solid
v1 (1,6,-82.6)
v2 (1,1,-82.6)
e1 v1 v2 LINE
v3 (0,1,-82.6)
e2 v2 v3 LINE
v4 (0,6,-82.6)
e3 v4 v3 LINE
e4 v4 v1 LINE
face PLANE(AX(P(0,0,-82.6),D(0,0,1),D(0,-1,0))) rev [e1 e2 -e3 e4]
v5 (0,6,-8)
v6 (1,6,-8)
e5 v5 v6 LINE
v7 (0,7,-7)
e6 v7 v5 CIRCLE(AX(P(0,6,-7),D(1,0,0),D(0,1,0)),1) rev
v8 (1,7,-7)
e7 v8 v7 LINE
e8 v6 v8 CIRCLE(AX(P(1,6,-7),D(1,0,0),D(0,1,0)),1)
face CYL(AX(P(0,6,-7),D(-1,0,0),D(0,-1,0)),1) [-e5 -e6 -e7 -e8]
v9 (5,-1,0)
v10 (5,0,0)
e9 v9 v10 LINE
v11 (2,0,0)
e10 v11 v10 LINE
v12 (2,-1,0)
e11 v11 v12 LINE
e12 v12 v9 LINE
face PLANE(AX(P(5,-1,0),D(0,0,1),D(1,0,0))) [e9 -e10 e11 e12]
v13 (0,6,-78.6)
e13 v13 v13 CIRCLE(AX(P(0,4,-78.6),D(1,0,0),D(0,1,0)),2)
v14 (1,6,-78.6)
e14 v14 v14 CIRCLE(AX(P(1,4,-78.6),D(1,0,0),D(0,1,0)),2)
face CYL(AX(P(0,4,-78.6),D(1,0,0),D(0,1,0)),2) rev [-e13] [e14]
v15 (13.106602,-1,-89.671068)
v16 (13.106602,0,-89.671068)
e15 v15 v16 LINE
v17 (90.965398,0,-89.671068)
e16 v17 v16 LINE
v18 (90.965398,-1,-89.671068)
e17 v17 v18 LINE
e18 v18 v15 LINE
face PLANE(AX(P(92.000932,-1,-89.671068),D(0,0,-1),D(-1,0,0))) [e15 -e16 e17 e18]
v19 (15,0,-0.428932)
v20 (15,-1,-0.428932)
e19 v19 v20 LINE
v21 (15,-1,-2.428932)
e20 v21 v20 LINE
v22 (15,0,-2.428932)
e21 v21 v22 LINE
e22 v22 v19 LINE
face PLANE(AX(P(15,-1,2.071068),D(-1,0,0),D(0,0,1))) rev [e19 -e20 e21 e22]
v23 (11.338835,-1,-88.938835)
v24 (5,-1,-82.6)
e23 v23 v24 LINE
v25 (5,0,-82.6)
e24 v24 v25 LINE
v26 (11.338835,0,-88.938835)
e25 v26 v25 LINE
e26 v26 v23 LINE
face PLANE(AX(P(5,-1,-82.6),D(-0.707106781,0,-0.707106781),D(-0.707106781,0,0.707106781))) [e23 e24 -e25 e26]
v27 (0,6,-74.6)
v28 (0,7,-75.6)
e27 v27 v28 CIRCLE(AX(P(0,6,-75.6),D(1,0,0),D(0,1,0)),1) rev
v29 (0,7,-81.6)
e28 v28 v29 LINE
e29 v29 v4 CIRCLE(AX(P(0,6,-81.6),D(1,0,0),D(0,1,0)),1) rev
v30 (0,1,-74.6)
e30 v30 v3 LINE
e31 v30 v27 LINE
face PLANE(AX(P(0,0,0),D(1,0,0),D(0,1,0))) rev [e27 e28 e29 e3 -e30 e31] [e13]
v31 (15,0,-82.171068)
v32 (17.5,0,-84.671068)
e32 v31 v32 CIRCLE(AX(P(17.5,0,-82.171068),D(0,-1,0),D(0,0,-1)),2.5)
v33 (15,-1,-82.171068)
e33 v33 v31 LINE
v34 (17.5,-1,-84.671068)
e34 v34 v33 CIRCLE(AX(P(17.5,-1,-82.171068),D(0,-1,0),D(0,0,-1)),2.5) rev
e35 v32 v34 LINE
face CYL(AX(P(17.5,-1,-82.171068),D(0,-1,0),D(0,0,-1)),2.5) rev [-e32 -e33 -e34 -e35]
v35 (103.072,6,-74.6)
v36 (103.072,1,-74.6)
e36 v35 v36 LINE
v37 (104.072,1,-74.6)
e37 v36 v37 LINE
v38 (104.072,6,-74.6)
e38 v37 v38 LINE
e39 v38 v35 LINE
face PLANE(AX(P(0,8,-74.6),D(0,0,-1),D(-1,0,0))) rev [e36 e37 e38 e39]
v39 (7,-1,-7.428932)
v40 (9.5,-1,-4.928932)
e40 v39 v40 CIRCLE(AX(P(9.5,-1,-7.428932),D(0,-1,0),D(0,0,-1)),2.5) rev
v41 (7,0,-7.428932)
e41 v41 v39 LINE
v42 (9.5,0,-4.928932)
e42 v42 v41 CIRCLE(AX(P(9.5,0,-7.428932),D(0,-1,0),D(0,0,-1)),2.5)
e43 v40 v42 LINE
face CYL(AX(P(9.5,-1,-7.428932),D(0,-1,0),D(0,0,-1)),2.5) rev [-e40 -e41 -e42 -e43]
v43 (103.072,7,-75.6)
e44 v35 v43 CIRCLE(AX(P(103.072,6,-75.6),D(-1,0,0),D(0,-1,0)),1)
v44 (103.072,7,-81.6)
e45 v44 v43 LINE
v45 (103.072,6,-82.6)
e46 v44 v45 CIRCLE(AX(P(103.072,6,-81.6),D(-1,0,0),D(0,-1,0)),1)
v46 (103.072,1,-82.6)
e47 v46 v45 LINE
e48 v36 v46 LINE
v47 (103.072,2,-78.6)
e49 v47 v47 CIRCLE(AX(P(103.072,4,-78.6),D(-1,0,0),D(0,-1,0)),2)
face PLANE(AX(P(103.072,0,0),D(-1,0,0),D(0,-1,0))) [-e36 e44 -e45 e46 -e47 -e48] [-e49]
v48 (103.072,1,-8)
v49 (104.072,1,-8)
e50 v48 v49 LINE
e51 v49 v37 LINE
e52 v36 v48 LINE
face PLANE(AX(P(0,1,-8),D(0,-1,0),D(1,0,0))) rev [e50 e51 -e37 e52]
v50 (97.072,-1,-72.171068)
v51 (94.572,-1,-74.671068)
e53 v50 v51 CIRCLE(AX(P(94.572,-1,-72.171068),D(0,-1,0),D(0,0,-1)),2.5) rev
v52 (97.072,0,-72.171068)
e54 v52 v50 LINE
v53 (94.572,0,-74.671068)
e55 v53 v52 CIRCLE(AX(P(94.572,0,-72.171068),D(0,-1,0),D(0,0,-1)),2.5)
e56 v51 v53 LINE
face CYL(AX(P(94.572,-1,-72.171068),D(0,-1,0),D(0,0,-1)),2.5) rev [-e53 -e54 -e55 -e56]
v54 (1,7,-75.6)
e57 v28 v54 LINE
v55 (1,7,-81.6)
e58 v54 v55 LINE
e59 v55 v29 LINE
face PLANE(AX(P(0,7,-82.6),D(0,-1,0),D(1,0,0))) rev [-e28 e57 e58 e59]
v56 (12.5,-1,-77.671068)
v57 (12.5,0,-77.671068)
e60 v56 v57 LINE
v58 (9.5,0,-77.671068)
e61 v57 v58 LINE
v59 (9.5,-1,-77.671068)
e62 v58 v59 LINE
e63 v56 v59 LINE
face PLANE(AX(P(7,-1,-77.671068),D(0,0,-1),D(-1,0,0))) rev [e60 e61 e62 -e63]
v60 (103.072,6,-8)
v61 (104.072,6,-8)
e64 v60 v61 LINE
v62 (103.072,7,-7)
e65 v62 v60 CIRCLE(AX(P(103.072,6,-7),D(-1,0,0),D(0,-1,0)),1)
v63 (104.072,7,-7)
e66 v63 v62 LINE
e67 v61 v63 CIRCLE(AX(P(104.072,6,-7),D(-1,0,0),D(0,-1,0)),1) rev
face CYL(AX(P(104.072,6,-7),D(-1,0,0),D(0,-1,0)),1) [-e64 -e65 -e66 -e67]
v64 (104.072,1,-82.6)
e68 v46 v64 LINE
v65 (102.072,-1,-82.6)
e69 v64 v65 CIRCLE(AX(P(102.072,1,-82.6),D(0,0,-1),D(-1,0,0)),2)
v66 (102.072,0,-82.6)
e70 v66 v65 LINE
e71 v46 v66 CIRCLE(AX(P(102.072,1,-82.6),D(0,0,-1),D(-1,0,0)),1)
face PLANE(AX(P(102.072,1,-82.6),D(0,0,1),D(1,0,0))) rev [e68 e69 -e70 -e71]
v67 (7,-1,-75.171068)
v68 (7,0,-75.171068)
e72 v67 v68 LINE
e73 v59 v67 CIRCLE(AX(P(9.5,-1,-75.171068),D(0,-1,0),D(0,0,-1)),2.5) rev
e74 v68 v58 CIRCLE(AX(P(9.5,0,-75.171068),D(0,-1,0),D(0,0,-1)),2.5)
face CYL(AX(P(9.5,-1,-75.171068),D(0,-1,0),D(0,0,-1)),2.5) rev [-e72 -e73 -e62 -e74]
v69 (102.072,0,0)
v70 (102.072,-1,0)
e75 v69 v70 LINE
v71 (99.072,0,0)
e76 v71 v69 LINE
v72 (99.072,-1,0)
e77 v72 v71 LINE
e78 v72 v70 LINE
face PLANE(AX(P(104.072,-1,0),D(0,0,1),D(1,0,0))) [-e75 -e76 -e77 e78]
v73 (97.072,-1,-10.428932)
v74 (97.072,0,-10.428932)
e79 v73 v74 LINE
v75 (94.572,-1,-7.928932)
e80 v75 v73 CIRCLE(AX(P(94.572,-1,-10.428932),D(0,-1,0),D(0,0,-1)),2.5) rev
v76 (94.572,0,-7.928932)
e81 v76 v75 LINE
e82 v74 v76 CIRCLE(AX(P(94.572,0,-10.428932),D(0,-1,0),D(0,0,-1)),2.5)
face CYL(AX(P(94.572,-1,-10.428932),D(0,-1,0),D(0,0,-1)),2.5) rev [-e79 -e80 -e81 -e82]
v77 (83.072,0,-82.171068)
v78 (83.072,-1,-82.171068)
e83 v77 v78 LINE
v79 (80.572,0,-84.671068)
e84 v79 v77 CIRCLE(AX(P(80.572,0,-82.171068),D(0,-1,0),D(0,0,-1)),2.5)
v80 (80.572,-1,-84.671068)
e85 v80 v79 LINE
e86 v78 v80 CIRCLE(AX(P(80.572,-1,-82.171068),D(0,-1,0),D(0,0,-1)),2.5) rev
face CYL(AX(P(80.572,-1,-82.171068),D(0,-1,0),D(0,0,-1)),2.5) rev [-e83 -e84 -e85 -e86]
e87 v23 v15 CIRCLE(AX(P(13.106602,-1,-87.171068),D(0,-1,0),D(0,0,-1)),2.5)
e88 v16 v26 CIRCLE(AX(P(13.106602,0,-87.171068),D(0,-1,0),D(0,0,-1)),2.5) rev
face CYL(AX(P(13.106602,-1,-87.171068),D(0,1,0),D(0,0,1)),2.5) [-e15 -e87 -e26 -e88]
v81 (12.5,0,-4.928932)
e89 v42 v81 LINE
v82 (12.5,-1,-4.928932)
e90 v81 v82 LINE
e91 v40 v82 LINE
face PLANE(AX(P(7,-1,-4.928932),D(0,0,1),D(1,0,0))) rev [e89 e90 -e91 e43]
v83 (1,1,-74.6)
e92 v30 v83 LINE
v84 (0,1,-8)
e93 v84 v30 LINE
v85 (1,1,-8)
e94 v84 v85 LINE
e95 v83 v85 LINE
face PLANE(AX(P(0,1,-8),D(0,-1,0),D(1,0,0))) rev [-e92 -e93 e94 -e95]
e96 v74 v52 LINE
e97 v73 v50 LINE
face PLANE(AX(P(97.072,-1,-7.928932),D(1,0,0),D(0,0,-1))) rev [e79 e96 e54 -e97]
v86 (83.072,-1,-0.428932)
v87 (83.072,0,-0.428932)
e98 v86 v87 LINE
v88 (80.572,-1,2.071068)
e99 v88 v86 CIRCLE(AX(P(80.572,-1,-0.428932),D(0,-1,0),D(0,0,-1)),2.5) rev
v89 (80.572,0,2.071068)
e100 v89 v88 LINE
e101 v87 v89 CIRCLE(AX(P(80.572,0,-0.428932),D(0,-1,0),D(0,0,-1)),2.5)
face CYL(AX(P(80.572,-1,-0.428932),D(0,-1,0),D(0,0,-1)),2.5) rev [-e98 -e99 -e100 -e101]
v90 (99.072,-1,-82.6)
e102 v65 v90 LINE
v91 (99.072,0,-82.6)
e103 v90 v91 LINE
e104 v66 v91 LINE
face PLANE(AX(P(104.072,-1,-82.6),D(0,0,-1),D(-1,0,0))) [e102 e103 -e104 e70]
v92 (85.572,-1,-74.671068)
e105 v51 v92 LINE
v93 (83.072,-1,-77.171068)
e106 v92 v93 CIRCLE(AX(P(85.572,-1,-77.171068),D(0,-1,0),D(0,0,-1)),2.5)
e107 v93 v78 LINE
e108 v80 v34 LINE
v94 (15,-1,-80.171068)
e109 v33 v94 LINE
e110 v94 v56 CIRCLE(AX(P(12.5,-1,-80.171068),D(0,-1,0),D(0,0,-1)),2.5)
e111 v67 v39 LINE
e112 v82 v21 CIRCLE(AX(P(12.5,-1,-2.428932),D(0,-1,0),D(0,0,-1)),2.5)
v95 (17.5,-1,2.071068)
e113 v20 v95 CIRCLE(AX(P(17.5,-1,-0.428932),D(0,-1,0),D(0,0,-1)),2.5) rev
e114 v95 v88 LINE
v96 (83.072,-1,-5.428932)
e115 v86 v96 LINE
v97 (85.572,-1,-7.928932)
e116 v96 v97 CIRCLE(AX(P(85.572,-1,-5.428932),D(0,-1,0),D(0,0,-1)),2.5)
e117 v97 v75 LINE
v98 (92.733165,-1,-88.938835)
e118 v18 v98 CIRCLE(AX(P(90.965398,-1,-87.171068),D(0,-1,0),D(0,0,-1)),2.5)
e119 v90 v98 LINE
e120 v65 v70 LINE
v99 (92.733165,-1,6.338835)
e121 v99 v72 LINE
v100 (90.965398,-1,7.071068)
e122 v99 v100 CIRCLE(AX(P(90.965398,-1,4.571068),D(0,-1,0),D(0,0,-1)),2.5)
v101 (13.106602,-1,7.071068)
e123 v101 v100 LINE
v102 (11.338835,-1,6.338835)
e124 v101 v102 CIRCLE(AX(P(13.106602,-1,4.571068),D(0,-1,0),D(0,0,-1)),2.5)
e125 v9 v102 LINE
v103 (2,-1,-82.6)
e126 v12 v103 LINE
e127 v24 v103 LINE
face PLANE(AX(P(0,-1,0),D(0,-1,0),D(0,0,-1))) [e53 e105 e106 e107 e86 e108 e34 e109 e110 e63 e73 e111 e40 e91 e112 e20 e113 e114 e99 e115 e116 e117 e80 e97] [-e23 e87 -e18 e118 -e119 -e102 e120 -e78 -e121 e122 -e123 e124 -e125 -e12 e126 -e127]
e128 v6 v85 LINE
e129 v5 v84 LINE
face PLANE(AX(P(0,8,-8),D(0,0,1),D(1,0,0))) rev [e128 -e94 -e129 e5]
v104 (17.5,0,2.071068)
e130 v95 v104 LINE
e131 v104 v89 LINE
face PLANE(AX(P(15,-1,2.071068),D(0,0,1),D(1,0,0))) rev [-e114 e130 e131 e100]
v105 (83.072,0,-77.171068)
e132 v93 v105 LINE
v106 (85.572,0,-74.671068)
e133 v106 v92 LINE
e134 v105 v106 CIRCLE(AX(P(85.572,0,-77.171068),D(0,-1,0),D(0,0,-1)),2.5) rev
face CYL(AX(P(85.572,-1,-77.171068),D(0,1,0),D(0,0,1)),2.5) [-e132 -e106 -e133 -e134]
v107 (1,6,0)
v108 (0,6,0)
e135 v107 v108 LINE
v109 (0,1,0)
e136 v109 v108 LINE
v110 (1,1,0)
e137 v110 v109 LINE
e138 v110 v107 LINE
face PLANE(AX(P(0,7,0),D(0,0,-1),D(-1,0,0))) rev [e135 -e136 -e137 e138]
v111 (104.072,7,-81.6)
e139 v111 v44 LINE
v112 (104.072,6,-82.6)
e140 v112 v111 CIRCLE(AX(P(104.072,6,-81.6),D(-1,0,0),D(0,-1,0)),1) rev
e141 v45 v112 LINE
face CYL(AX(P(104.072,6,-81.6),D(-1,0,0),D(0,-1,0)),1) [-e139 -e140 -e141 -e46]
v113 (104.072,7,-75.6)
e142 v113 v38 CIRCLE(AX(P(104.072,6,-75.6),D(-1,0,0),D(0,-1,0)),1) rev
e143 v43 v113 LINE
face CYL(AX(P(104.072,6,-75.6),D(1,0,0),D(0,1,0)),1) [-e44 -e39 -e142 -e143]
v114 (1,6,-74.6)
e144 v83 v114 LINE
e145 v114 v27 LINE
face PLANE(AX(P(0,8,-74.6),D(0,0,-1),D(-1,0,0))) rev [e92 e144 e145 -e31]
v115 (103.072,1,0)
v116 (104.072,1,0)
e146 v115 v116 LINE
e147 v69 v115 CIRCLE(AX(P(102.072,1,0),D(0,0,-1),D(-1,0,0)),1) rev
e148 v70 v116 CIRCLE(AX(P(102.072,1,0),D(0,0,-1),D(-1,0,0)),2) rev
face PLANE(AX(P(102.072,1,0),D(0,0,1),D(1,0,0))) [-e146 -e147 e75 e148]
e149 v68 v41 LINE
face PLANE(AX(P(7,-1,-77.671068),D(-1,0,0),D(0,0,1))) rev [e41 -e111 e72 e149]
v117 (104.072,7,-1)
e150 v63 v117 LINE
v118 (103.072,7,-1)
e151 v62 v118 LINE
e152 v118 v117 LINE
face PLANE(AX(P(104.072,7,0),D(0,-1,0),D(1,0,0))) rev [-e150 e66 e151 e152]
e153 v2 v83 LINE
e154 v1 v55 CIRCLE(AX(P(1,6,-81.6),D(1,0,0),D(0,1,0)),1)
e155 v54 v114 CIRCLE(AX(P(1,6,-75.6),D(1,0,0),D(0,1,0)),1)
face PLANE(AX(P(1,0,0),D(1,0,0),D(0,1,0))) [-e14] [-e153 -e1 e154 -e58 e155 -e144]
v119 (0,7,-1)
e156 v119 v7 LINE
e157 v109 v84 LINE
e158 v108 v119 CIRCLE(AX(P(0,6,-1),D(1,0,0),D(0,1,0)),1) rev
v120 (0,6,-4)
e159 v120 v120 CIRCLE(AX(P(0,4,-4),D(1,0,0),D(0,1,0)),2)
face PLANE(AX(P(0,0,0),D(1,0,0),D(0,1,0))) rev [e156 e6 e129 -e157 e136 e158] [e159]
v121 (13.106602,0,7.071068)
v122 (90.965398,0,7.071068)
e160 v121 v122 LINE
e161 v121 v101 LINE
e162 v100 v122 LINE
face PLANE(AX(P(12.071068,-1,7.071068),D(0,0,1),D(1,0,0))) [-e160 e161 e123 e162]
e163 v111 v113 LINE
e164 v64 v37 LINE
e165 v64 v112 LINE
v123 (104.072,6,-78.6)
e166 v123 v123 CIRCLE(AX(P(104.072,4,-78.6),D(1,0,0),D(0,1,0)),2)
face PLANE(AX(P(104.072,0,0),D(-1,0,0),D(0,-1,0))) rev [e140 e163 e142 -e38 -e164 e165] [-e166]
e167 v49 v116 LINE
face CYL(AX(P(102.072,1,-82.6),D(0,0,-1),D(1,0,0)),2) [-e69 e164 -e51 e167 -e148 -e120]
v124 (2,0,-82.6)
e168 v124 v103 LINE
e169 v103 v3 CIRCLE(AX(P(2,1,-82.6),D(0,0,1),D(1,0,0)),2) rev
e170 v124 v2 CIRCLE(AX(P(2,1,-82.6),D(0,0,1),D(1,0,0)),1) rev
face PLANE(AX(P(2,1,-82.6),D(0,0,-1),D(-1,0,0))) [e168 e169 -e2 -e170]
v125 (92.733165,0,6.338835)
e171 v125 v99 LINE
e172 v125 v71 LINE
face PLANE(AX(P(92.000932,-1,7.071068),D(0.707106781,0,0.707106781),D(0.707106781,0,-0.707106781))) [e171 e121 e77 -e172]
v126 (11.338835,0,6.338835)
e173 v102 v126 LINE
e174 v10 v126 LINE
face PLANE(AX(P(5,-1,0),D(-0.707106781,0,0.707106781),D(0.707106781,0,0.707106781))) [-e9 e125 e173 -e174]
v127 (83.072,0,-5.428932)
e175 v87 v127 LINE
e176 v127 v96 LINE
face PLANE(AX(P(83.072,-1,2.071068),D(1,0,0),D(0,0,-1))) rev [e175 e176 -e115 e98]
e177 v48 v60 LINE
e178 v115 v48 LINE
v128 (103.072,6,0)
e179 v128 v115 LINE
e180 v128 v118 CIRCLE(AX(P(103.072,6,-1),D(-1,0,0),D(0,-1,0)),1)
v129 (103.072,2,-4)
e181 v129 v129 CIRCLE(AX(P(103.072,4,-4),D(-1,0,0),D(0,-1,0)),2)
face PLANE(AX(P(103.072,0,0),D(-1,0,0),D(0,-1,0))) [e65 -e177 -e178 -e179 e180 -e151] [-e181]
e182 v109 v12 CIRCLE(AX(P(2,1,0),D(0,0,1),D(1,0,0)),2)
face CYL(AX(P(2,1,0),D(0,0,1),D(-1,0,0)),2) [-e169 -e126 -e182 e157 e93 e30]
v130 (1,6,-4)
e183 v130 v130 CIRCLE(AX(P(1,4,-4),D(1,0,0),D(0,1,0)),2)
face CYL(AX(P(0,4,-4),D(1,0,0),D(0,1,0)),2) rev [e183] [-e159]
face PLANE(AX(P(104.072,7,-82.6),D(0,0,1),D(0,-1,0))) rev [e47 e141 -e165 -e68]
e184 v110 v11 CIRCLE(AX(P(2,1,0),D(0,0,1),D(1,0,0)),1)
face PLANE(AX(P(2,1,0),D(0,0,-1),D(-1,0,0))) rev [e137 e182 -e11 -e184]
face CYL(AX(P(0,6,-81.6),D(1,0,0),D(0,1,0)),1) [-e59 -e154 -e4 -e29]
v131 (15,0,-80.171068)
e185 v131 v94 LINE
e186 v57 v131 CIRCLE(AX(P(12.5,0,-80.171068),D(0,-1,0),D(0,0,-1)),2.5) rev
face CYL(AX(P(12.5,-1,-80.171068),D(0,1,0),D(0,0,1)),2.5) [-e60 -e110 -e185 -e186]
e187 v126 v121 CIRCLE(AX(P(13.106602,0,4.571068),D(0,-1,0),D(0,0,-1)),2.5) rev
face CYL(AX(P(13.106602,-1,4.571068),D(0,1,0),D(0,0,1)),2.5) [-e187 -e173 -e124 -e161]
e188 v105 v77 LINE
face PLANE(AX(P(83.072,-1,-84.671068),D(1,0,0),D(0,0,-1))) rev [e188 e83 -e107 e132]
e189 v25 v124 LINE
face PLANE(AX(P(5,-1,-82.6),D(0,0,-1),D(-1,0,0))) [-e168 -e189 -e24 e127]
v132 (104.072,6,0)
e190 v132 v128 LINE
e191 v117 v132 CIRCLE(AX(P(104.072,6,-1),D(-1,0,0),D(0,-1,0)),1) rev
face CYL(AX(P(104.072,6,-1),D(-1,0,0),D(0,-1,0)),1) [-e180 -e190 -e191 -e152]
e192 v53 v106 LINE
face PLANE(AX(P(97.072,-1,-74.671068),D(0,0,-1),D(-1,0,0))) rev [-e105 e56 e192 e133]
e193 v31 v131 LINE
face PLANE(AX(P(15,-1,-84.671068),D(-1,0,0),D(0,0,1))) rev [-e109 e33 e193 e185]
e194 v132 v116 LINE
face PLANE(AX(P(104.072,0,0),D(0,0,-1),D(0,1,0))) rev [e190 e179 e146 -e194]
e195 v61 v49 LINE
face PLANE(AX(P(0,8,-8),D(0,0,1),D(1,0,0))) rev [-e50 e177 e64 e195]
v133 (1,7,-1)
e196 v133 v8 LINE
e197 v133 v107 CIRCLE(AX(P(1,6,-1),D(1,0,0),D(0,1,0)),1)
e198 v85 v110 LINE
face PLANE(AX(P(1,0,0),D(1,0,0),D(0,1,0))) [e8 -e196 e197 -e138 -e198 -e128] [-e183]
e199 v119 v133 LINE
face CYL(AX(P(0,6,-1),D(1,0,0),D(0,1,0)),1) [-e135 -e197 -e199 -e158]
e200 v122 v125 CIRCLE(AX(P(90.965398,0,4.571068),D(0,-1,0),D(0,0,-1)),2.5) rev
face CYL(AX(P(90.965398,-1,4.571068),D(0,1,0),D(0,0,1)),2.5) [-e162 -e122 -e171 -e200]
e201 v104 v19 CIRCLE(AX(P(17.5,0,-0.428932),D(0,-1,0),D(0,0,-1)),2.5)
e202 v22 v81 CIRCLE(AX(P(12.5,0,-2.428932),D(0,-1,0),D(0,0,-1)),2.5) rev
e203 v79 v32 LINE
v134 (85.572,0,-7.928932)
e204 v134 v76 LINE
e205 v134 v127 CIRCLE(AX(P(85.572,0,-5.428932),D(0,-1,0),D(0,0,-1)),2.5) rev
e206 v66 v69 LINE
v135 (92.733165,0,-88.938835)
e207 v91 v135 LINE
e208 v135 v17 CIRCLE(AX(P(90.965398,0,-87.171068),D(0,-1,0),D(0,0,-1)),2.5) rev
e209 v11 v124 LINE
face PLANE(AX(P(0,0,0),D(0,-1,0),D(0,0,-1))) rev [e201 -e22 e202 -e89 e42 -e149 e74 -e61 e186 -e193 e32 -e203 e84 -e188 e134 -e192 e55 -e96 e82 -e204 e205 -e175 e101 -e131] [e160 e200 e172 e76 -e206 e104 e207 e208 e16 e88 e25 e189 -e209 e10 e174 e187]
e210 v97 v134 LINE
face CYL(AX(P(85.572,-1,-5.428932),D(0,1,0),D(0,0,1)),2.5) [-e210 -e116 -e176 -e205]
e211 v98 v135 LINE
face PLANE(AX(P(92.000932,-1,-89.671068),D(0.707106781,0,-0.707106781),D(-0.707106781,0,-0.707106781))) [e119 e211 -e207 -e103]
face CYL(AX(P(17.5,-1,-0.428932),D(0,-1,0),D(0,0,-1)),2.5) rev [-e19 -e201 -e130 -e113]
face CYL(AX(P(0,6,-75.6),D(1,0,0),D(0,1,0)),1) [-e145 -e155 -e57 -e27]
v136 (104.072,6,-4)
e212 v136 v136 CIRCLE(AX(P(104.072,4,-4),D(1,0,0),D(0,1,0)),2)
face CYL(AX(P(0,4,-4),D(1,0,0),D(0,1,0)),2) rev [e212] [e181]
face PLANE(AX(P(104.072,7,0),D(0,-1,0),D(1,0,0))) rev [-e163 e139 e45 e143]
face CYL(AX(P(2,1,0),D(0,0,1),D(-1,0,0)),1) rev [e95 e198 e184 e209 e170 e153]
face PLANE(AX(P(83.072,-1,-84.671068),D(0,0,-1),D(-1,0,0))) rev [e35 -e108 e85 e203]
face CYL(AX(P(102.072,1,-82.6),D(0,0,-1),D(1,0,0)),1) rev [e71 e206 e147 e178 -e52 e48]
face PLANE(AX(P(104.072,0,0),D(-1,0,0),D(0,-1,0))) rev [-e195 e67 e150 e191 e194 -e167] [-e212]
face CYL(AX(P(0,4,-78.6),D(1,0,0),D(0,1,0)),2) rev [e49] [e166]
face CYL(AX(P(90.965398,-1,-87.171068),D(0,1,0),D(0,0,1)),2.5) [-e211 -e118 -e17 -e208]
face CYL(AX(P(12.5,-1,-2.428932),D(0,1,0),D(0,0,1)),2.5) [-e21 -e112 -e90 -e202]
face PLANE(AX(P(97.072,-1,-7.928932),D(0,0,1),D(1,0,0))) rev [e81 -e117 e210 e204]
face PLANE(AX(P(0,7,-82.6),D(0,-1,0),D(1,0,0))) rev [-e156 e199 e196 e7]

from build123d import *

# Parameters (mm, degrees)
BASE_FLANGE2_DEPTH             = 1
EDGE_FLANGE1_STRIP_W           = 6
EDGE_FLANGE1_STRIP_H           = 1
EDGE_FLANGE1_STRIP_CUT_DEPTH   = 82.6
EDGE_FLANGE1_STRIP_2_W         = 6
EDGE_FLANGE1_STRIP_2_H         = 1
EDGE_FLANGE1_STRIP_CUT_2_DEPTH = 82.6
EDGE_FLANGE1_DEPTH             = 82.6
EDGE_FLANGE1_BEND_DEPTH        = 82.6
SKETCH16_W                     = 66.6
SKETCH16_H                     = 7
CUT_EXTRUDE1_DEPTH             = 138.553195479
FILLET1_R                      = 1
SKETCH17_R                     = 2
CUT_EXTRUDE2_DEPTH             = 138.553195479
CUT_EXTRUDE3_DEPTH             = 138.553195479
FILLET2_R                      = 2.5


# Sheet-metal steps are written as plain solids
with BuildPart() as part:
    # Sketch1 → Base-Flange2 (new body)
    with BuildSketch(Plane(origin=(0, 0, 0), x_dir=(1, 0, 0), z_dir=(0, 1, 0))):
        Polygon((0, 0), (0, 82.6), (5, 82.6), (12.071067812, 89.671067812), (92.000932188, 89.671067812), (99.072, 82.6), (104.072, 82.6), (104.072, 0), (99.072, 0), (92.000932188, -7.071067812), (12.071067812, -7.071067812), (5, 0), align=None)
    extrude(amount=-BASE_FLANGE2_DEPTH)

    # Edge-Flange1 strip (across the edge) → Edge-Flange1 strip cut (cut)
    with BuildSketch(Plane(origin=(104.072, 0, 0), x_dir=(-1, 0, 0), z_dir=(0, 0, -1))):
        with Locations((-1, -0.5)):
            Rectangle(EDGE_FLANGE1_STRIP_W, EDGE_FLANGE1_STRIP_H)
    extrude(amount=EDGE_FLANGE1_STRIP_CUT_DEPTH, mode=Mode.SUBTRACT)

    # Edge-Flange1 strip 2 (across the edge) → Edge-Flange1 strip cut 2 (cut)
    with BuildSketch(Plane.XY.offset(-82.6)):
        with Locations((-1, -0.5)):
            Rectangle(EDGE_FLANGE1_STRIP_2_W, EDGE_FLANGE1_STRIP_2_H)
    extrude(amount=EDGE_FLANGE1_STRIP_CUT_2_DEPTH, mode=Mode.SUBTRACT)

    # Edge-Flange1 section (across the edge) → Edge-Flange1 (add)
    with BuildSketch(Plane(origin=(104.072, 0, 0), x_dir=(-1, 0, 0), z_dir=(0, 0, -1))):
        with BuildLine():
            Line((0, 1), (0, 7))
            Line((0, 7), (1, 7))
            Line((1, 7), (1, 1))
            ThreePointArc((1, 1), (1.292893219, 0.292893219), (2, 0))
            Line((2, 0), (2, -1))
            ThreePointArc((2, -1), (0.585786438, -0.414213562), (0, 1))
        make_face()
    extrude(amount=EDGE_FLANGE1_DEPTH)

    # Edge-Flange1 section 2 (across the edge) → Edge-Flange1 bend (add)
    with BuildSketch(Plane.XY.offset(-82.6)):
        with BuildLine():
            Line((0, 1), (0, 7))
            Line((0, 7), (1, 7))
            Line((1, 7), (1, 1))
            ThreePointArc((1, 1), (1.292893219, 0.292893219), (2, 0))
            Line((2, 0), (2, -1))
            ThreePointArc((2, -1), (0.585786438, -0.414213562), (0, 1))
        make_face()
    extrude(amount=EDGE_FLANGE1_BEND_DEPTH)

    # Sketch16 → Cut-Extrude1 (cut, through all)
    with BuildSketch(Plane(origin=(104.072, 0, 0), x_dir=(0, 0, -1), z_dir=(1, 0, 0))):
        with Locations((41.3, 4.5)):
            Rectangle(SKETCH16_W, SKETCH16_H)
    extrude(amount=-CUT_EXTRUDE1_DEPTH, mode=Mode.SUBTRACT)

    # Fillet1
    fillet1_edges = [part.edges().sort_by_distance(p)[0] for p in [
        (0.5, 7, -74.6),
        (0.5, 7, -8),
        (103.572, 7, -8),
        (103.572, 7, -74.6),
        (103.572, 7, 0),
        (103.572, 7, -82.6),
        (0.5, 7, -82.6),
        (0.5, 7, 0),
    ]]
    fillet(fillet1_edges, radius=FILLET1_R)

    # Sketch17 → Cut-Extrude2 (cut, through all)
    with BuildSketch(Plane(origin=(104.072, 0, 0), x_dir=(0, 0, -1), z_dir=(1, 0, 0))):
        with Locations(Location((4, 4, 0), (0, 0, 90))):
            Circle(SKETCH17_R)
        with Locations(Location((78.6, 4, 0), (0, 0, 90))):
            Circle(SKETCH17_R)
    extrude(amount=-CUT_EXTRUDE2_DEPTH, mode=Mode.SUBTRACT)

    # Sketch19 → Cut-Extrude3 (cut, through all)
    with BuildSketch(Plane(origin=(0, 0, 0), x_dir=(1, 0, 0), z_dir=(0, 1, 0))):
        Polygon((15, -2.071067812), (83.072, -2.071067812), (83.072, 7.928932188), (97.072, 7.928932188), (97.072, 74.671067812), (83.072, 74.671067812), (83.072, 84.671067812), (15, 84.671067812), (15, 77.671067812), (7, 77.671067812), (7, 4.928932188), (15, 4.928932188), align=None)
    extrude(amount=-CUT_EXTRUDE3_DEPTH, mode=Mode.SUBTRACT)

    # Fillet2
    fillet2_edges = [part.edges().sort_by_distance(p)[0] for p in [
        (12.071067812, -0.5, -89.671067812),
        (92.000932188, -0.5, -89.671067812),
        (92.000932188, -0.5, 7.071067812),
        (12.071067812, -0.5, 7.071067812),
        (15, -0.5, 2.071067812),
        (15, -0.5, -4.928932188),
        (7, -0.5, -4.928932188),
        (7, -0.5, -77.671067812),
        (15, -0.5, -77.671067812),
        (15, -0.5, -84.671067812),
        (83.072, -0.5, -84.671067812),
        (83.072, -0.5, -74.671067812),
        (97.072, -0.5, -74.671067812),
        (97.072, -0.5, -7.928932188),
        (83.072, -0.5, -7.928932188),
        (83.072, -0.5, 2.071067812),
    ]]
    fillet(fillet2_edges, radius=FILLET2_R)


solid = part.part
